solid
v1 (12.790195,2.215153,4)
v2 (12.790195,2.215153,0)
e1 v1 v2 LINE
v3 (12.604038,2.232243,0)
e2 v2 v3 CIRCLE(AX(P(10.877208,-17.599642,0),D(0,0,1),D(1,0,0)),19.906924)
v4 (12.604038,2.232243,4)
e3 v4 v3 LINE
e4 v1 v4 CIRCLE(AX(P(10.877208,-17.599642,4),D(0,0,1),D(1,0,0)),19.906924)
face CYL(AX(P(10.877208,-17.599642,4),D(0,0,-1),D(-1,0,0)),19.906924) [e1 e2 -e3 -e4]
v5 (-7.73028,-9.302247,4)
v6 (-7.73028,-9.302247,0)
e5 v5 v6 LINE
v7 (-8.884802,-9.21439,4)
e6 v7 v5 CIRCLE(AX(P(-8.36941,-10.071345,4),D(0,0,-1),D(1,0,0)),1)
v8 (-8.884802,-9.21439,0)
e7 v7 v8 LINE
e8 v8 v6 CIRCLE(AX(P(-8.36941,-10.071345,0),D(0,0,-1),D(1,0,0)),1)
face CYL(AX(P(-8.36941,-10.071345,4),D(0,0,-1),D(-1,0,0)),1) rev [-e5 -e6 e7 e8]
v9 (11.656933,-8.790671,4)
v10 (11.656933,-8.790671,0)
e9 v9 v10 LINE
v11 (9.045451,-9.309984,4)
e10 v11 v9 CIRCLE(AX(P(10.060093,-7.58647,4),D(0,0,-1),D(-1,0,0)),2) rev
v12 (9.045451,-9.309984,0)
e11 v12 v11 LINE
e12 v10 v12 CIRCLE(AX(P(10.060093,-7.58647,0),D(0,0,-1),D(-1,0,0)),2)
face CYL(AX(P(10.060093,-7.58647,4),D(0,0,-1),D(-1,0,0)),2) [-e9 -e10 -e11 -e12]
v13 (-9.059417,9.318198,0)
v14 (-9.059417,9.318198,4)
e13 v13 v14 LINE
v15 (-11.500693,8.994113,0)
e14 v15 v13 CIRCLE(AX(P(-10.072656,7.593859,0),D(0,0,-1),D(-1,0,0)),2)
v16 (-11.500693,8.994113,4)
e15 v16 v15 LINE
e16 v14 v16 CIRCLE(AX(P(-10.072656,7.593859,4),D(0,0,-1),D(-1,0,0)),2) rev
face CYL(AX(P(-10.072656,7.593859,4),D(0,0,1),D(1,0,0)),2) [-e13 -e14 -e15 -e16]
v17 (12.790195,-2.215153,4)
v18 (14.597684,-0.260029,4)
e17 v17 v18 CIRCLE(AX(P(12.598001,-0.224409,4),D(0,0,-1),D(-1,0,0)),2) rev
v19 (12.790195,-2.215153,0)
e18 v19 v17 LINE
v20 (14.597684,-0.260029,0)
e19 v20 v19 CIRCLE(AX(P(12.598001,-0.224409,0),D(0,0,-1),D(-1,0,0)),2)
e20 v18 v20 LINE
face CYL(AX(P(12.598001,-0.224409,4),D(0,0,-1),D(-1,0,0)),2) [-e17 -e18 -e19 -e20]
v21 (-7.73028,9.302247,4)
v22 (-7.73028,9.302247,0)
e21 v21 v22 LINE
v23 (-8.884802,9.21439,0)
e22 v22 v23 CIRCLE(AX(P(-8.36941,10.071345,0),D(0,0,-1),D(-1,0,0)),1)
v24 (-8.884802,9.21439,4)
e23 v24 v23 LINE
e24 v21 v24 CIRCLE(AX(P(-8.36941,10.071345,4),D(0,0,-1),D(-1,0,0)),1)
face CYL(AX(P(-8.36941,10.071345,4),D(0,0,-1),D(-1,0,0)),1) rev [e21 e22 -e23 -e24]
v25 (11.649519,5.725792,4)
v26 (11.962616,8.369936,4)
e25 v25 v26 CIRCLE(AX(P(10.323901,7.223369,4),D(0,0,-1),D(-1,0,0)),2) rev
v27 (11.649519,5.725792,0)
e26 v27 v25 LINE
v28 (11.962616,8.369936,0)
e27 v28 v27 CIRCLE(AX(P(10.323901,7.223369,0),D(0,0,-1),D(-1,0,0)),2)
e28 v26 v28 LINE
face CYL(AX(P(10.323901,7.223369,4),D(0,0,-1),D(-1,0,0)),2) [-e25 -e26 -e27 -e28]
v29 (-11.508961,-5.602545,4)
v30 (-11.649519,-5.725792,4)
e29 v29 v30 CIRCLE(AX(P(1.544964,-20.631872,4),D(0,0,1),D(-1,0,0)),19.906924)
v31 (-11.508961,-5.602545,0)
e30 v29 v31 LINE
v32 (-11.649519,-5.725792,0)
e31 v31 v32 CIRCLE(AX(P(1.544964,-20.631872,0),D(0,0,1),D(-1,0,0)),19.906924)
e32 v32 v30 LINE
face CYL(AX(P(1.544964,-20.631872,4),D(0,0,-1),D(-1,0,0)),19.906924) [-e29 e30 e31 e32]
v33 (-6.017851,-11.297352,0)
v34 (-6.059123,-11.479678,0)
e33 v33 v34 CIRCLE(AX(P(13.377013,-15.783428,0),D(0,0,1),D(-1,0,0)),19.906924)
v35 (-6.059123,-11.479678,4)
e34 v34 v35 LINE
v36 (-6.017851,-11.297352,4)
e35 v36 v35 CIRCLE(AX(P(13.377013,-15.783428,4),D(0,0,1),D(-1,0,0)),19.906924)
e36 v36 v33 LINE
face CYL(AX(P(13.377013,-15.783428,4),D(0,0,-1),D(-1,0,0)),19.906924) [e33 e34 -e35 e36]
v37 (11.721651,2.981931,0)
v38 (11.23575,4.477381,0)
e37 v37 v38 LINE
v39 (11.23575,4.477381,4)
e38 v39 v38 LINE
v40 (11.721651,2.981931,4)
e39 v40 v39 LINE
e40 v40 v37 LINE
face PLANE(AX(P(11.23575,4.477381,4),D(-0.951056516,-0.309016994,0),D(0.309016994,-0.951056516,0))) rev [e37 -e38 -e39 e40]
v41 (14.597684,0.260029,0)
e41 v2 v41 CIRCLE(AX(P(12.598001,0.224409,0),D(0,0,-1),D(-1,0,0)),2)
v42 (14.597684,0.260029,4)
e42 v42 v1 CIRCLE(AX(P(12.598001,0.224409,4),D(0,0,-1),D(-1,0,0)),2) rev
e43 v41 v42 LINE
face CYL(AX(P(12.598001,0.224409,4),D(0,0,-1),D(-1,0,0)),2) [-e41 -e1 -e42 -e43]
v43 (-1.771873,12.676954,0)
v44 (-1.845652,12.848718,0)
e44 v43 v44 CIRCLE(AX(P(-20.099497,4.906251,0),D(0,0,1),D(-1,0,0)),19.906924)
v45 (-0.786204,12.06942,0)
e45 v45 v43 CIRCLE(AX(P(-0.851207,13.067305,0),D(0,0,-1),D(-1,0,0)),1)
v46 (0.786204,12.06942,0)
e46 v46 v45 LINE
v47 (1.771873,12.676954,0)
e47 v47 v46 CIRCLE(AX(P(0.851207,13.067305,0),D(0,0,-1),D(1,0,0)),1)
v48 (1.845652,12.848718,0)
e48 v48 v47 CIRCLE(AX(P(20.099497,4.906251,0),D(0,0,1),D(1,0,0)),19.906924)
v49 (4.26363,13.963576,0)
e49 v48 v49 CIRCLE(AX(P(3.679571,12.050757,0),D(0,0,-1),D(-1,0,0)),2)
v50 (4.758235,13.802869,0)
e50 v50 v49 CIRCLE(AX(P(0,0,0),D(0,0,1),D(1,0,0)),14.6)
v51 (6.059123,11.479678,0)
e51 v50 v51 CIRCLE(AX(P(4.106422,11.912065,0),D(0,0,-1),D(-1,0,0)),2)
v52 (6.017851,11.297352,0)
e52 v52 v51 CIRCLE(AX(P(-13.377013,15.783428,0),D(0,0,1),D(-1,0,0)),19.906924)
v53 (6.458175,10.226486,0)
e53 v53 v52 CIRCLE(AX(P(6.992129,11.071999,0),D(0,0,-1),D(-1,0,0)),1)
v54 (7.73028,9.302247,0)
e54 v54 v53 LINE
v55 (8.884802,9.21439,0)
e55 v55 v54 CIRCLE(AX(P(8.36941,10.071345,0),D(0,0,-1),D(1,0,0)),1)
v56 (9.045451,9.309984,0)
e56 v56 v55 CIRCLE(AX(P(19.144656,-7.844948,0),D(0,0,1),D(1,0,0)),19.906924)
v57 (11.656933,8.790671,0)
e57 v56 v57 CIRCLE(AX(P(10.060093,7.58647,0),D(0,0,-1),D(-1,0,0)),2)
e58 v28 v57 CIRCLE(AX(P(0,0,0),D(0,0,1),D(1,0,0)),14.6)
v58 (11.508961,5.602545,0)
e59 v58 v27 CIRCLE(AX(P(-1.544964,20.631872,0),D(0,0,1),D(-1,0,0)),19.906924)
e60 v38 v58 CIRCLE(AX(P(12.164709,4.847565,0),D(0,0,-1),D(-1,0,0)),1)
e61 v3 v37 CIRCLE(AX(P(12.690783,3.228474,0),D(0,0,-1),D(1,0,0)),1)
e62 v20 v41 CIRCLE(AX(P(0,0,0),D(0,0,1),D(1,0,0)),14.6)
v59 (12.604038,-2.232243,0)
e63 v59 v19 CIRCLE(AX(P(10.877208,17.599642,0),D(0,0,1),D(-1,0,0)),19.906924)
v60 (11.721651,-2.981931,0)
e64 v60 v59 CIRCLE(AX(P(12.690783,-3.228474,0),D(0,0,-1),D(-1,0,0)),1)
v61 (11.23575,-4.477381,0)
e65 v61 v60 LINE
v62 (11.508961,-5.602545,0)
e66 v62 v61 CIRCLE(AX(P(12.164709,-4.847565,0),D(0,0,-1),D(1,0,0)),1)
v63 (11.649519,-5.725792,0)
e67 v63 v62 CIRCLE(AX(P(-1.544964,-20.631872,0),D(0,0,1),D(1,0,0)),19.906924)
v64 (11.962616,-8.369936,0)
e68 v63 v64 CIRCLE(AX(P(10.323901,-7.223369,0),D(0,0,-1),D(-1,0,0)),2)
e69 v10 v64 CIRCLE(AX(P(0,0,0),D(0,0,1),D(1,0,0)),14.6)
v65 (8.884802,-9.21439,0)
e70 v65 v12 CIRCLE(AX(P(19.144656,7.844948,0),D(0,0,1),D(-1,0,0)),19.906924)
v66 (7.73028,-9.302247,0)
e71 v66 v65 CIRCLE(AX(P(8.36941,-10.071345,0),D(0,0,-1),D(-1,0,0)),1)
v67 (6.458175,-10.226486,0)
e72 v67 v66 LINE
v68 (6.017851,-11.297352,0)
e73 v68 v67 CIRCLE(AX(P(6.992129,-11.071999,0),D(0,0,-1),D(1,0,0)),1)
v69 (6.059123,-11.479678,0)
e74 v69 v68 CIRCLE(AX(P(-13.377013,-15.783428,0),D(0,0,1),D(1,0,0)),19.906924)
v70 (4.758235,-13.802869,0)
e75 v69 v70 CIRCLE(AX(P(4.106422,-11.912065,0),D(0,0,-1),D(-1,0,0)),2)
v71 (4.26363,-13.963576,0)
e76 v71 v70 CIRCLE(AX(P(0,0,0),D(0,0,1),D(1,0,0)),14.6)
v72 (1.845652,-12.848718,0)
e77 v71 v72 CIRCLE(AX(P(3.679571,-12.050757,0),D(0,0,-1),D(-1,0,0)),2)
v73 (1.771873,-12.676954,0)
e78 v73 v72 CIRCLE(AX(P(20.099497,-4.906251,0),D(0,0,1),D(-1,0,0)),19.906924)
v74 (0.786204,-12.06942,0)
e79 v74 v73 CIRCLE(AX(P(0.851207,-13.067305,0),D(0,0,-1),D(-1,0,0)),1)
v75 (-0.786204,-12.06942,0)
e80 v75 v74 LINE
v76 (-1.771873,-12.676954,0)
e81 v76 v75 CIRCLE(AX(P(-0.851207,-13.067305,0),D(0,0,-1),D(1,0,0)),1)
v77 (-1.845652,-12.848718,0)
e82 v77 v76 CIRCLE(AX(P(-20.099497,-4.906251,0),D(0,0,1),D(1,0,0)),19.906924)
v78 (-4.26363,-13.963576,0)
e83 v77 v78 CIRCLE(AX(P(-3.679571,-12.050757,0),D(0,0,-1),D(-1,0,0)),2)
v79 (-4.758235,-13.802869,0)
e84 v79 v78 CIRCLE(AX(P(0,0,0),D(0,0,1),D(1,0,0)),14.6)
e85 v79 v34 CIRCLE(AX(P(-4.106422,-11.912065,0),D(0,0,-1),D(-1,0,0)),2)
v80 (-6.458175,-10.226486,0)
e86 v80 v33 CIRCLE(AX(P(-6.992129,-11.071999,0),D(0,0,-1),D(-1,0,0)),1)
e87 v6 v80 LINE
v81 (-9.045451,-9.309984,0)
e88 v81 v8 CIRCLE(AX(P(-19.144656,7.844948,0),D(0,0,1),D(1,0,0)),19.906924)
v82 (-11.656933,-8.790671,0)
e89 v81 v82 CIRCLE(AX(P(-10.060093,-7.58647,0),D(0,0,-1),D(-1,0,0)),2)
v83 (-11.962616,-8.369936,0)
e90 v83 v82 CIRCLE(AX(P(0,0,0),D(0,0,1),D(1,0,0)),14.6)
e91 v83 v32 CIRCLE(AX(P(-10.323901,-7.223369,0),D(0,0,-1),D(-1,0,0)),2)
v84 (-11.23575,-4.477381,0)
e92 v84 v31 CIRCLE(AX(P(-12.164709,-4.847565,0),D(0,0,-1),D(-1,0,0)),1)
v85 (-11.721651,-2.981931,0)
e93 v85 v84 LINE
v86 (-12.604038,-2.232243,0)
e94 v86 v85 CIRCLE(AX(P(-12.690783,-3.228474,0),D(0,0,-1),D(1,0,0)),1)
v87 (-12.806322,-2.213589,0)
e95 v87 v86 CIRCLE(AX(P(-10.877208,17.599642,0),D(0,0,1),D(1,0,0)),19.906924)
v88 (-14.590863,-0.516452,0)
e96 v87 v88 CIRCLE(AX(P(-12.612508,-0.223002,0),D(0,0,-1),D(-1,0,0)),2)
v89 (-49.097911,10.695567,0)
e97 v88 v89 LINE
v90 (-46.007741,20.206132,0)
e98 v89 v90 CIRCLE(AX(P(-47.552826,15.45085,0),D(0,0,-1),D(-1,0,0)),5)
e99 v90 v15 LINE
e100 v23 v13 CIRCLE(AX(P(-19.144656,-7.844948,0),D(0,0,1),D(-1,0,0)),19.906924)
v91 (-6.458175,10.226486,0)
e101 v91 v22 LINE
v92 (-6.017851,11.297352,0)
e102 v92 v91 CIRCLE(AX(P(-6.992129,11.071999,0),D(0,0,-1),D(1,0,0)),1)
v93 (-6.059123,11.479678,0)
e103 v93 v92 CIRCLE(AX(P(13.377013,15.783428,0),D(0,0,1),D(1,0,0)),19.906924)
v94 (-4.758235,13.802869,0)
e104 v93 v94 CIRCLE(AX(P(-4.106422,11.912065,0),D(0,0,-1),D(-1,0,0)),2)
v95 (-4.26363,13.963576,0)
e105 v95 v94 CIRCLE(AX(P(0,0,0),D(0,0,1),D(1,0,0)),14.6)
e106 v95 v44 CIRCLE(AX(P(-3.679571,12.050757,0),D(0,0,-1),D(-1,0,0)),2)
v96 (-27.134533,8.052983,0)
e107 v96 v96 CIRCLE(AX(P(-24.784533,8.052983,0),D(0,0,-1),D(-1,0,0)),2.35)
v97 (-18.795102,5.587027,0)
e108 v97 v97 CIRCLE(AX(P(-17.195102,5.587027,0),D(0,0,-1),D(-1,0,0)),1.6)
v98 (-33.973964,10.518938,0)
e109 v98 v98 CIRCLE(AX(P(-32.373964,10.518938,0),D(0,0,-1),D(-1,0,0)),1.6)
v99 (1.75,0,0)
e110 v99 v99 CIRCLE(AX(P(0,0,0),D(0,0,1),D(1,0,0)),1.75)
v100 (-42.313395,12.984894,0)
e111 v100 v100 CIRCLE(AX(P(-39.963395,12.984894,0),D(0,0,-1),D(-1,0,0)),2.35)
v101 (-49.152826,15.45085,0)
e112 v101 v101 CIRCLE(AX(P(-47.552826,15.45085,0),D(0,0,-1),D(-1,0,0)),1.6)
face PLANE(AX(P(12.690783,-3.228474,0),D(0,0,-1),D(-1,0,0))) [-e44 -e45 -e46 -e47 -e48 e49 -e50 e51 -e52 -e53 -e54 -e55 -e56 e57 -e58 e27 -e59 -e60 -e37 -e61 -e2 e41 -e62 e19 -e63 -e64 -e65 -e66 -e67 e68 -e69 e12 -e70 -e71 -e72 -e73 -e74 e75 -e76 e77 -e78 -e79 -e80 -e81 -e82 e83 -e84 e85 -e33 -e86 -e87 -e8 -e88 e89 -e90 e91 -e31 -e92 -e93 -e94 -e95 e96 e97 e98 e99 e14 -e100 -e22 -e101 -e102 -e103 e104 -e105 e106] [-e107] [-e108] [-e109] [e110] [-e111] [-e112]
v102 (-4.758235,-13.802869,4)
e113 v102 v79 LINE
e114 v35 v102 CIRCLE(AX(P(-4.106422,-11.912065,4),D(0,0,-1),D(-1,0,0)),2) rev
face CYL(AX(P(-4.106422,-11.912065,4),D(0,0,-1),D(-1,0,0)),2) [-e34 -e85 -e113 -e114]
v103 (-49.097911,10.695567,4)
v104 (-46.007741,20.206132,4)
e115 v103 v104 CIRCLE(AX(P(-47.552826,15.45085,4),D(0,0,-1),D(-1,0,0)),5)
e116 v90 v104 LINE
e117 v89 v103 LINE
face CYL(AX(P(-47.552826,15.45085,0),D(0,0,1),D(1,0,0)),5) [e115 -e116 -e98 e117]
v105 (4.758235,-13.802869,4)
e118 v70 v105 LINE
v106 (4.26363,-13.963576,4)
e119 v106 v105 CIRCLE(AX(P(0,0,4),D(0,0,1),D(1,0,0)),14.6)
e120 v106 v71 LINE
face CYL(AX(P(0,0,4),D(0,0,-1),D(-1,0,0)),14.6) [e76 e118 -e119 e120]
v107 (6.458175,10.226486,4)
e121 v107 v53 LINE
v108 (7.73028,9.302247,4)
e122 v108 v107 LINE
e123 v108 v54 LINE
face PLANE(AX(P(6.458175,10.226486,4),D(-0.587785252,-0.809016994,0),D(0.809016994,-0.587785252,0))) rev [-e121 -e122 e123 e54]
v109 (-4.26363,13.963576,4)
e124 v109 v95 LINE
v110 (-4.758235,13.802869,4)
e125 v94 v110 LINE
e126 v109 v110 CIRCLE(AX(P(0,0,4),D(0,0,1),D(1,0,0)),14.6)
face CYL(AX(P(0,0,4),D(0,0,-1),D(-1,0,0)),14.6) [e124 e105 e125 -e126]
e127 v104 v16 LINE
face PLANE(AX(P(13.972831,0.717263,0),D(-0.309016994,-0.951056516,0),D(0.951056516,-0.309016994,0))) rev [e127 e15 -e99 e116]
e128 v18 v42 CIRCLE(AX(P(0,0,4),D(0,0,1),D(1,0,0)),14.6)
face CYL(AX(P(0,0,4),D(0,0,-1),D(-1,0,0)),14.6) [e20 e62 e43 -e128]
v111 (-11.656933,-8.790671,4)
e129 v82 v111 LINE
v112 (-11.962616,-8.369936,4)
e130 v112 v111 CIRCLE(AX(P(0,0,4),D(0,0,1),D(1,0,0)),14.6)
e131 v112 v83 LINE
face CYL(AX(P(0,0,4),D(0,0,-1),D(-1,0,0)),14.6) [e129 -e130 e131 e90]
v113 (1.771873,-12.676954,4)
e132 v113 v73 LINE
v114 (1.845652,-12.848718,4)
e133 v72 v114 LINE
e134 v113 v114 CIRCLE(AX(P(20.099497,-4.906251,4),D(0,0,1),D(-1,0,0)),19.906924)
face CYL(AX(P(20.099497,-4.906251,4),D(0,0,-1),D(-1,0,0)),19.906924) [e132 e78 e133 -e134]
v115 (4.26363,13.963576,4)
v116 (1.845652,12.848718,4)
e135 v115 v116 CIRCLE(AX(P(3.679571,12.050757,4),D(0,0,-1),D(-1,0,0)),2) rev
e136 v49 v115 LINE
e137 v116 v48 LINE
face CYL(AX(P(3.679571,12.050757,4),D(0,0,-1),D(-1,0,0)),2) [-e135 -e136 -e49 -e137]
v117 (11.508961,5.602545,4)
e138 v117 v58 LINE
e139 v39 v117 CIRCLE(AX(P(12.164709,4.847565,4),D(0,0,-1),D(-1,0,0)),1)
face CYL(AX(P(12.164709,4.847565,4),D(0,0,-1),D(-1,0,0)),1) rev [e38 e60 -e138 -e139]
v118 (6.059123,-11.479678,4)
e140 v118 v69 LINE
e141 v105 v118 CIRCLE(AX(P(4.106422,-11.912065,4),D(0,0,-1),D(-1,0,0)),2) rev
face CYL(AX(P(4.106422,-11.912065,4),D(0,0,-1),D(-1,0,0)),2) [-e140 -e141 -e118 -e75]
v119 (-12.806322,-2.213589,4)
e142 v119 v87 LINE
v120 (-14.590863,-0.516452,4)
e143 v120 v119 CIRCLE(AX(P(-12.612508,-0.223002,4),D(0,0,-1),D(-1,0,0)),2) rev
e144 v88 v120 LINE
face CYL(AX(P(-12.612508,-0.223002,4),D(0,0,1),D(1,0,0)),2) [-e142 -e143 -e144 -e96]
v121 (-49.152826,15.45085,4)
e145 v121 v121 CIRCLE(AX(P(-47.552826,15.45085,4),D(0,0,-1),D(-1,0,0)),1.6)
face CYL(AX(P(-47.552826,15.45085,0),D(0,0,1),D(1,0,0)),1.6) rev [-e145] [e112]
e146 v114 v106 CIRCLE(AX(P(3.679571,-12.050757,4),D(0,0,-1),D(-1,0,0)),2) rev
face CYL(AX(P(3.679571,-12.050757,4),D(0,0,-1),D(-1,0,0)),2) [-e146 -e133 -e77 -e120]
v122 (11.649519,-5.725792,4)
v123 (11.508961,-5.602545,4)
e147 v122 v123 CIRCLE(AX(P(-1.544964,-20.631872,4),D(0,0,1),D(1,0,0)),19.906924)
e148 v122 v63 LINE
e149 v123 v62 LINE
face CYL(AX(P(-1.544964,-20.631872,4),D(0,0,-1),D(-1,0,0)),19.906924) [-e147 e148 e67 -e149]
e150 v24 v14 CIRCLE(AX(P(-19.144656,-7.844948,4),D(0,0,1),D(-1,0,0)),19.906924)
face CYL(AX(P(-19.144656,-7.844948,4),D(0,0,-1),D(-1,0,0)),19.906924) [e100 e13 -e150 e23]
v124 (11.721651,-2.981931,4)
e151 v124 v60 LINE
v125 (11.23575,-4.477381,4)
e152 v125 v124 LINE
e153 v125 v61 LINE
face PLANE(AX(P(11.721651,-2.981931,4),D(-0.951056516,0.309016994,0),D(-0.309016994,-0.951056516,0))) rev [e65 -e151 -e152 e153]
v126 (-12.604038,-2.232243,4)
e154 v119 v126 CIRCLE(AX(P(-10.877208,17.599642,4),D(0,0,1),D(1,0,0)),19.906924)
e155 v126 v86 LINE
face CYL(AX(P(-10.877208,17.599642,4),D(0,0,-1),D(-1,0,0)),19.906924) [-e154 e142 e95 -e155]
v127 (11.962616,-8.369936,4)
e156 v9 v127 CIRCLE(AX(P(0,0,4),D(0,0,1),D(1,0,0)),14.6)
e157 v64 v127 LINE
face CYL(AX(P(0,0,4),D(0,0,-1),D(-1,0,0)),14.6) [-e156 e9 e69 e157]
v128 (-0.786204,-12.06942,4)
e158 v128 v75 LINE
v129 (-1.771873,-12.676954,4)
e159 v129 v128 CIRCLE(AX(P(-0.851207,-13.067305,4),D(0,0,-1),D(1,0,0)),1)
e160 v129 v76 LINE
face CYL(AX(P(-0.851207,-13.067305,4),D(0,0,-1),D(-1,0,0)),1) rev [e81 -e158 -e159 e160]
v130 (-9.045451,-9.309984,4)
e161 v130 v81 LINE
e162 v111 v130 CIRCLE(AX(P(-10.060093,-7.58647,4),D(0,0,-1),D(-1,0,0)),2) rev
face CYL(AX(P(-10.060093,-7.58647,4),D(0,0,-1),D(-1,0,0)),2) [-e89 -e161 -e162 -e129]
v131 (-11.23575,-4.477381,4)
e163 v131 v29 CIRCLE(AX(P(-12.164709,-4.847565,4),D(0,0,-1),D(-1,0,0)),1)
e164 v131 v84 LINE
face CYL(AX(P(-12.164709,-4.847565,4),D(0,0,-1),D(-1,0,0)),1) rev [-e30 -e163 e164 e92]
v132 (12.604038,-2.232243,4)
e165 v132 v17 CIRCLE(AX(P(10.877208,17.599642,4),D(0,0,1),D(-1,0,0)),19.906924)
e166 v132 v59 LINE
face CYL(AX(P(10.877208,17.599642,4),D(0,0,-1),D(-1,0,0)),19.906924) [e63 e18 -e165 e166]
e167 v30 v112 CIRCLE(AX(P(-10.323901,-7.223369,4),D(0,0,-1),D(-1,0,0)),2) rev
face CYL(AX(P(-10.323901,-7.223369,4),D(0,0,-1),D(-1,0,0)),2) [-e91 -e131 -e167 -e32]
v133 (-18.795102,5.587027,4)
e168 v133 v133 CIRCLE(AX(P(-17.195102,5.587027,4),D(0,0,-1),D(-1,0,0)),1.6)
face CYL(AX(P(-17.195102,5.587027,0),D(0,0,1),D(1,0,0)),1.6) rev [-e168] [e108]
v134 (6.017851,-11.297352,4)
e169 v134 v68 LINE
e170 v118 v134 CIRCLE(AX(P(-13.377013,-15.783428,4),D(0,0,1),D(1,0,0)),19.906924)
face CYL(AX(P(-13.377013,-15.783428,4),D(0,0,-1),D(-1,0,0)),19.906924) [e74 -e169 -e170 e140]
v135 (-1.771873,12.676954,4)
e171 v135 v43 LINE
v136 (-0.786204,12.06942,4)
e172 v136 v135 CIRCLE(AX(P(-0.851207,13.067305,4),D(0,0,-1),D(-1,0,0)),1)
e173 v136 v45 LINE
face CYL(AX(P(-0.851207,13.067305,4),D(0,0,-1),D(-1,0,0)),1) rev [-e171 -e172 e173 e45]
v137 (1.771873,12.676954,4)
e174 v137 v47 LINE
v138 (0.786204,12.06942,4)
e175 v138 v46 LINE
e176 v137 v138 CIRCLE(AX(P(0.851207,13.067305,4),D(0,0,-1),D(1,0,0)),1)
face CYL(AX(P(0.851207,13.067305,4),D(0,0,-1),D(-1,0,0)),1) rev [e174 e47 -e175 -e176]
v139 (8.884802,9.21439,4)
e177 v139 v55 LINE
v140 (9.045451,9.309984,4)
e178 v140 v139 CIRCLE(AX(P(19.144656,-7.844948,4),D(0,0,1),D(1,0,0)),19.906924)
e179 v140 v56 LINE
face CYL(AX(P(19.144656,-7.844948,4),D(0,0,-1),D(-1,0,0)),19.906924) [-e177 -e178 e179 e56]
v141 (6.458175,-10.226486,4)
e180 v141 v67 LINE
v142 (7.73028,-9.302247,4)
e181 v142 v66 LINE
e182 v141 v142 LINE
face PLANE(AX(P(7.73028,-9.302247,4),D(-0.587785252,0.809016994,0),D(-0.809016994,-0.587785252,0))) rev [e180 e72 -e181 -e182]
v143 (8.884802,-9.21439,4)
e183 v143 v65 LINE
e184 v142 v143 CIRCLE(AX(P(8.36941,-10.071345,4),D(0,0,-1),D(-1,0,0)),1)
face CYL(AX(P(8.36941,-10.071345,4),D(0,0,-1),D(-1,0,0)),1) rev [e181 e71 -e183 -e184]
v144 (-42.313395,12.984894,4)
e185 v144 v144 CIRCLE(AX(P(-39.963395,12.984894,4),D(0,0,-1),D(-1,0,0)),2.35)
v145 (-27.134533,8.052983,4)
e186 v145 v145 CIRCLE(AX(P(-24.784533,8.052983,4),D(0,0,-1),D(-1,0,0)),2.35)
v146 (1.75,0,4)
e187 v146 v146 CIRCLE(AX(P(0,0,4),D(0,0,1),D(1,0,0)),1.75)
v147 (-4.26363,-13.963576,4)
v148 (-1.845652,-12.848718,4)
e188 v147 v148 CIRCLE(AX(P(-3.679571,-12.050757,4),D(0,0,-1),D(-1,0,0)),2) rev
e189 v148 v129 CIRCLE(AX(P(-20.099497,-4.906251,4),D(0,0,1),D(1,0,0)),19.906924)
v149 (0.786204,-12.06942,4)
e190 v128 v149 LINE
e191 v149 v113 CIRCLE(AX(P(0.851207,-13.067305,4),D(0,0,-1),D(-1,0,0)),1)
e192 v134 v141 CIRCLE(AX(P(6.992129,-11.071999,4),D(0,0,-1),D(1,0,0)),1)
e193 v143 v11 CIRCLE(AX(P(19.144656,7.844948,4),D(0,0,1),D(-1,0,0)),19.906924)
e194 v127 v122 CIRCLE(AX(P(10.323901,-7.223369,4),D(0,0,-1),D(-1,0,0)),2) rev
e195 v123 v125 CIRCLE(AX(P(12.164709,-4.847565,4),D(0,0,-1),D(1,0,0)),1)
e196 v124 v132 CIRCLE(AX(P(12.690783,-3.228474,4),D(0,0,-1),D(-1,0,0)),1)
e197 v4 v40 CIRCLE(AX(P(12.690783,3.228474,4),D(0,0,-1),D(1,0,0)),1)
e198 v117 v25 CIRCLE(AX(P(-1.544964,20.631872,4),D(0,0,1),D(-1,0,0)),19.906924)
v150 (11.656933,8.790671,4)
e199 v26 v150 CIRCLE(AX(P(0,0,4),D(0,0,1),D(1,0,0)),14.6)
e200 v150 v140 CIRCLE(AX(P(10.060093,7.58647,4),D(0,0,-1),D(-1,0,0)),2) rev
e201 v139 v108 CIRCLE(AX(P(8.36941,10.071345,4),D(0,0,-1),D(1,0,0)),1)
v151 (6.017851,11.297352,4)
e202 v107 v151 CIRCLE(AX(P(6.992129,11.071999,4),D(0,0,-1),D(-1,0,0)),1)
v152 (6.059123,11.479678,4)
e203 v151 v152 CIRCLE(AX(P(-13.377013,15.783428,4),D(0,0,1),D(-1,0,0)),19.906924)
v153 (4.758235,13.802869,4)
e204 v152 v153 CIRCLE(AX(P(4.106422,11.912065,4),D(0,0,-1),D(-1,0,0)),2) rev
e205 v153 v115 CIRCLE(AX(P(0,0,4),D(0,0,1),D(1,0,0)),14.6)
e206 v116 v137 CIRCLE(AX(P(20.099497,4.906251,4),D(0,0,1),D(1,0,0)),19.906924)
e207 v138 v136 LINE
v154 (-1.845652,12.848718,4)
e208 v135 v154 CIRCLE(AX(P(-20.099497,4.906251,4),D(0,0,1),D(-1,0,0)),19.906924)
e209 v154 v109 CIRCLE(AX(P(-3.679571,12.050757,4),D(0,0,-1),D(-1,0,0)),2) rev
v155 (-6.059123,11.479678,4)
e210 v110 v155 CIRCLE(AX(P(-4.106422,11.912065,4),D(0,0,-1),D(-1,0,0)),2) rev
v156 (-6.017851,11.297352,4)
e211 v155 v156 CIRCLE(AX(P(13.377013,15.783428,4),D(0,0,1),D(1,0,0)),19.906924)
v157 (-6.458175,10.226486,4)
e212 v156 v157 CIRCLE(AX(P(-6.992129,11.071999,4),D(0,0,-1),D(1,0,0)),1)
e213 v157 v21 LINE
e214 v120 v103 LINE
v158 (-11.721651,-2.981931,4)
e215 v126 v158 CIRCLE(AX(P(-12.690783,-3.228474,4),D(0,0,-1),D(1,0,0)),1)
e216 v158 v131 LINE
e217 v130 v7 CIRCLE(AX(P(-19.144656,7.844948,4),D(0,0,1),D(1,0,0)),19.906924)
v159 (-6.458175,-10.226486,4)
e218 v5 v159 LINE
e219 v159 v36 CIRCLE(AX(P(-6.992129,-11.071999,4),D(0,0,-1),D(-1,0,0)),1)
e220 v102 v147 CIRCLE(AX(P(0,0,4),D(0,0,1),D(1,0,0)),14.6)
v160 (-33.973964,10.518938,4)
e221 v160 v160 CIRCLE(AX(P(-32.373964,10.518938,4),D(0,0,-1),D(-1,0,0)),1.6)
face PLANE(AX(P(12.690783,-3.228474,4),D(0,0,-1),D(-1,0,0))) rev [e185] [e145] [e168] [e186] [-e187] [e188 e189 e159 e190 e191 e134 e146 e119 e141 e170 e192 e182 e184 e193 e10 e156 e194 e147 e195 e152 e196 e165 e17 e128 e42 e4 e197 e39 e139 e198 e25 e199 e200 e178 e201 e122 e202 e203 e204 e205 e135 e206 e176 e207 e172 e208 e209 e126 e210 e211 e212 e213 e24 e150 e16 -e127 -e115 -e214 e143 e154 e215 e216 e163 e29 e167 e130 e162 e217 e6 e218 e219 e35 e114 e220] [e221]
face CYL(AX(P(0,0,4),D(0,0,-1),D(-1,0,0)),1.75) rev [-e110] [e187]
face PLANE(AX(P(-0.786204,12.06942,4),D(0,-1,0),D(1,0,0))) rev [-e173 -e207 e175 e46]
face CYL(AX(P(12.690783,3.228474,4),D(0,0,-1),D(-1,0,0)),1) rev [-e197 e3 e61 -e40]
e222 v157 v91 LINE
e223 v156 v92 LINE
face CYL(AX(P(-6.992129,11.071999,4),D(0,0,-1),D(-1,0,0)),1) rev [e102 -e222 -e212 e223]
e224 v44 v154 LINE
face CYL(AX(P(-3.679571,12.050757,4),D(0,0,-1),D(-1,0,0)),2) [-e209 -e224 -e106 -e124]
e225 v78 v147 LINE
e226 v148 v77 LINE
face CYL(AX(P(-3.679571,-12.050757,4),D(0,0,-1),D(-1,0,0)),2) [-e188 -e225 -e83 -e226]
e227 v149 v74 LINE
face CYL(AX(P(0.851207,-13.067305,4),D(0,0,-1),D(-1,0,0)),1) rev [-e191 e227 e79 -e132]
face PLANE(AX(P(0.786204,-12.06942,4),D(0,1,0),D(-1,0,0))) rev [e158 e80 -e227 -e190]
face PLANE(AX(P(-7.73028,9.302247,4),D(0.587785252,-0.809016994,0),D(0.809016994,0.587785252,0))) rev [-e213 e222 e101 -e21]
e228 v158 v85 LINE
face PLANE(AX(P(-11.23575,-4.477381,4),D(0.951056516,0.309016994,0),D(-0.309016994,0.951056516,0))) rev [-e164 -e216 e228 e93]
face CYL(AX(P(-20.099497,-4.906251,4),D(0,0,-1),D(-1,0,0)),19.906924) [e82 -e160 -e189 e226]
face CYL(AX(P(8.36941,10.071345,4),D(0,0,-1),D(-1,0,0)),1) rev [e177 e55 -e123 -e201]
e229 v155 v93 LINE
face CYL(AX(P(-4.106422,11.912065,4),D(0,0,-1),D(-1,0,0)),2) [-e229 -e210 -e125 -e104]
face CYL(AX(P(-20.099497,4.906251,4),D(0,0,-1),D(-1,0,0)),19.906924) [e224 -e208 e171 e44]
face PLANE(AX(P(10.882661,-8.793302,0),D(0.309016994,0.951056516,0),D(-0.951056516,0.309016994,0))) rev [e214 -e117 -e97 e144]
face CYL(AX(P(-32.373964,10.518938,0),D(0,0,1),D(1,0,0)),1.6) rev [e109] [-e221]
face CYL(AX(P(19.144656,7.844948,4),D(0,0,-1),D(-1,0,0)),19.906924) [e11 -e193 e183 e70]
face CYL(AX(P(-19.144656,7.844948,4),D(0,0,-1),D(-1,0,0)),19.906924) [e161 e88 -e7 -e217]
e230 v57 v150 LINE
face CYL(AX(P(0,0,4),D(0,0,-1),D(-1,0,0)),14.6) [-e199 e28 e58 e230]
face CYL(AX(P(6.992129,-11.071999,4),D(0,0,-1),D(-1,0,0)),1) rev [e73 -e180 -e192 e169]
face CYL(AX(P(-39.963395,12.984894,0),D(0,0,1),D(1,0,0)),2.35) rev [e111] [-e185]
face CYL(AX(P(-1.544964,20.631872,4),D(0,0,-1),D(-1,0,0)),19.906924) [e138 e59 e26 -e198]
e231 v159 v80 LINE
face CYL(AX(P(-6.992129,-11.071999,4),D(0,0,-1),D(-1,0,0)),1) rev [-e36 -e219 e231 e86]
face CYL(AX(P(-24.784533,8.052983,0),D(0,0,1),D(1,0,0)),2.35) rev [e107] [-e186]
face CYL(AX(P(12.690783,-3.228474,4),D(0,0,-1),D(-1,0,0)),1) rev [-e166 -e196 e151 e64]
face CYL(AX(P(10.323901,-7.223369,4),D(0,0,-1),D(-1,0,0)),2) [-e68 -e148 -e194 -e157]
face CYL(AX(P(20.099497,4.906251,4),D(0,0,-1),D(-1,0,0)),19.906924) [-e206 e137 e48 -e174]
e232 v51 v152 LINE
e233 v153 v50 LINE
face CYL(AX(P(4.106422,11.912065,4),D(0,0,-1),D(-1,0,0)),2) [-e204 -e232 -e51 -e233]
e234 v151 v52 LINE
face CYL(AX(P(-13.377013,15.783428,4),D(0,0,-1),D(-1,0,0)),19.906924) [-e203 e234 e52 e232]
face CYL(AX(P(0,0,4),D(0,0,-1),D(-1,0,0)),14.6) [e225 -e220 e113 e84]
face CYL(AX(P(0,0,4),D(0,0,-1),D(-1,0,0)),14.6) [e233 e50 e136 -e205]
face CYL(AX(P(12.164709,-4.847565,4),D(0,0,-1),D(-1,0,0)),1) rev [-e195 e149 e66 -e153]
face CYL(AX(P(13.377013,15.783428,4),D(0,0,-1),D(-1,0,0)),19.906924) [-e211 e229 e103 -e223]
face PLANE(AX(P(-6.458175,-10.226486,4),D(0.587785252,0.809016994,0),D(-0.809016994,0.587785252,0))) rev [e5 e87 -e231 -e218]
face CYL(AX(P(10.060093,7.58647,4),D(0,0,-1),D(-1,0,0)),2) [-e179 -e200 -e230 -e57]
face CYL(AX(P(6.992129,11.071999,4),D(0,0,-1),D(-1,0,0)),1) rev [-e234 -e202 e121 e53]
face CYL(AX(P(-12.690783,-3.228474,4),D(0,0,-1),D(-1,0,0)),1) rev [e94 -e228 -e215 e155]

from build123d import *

# Parameters (mm, degrees)
SKETCH1_R           = 1.75
BOSS_EXTRUDE1_DEPTH = 4
BOSS_EXTRUDE2_START = -4
SKETCH2_R           = 1.6
SKETCH2_R_2         = 2.35
BOSS_EXTRUDE2_DEPTH = 4
FILLET1_R           = 2


with BuildPart() as part:
    # Sketch1 → Boss-Extrude1 (new body)
    with BuildSketch(Plane.XY):
        with BuildLine():
            Line((6.458174517, 10.22648556), (7.730280052, 9.302246788))
            ThreePointArc((7.730280052, 9.302246788), (8.293531937, 9.074228241), (8.884801529, 9.214390334))
            ThreePointArc((8.884801529, 9.214390334), (9.700788202, 9.679292345), (10.537793023, 10.105192636))
            ThreePointArc((10.537793023, 10.105192636), (11.811648118, 8.581664683), (12.866966432, 6.899360466))
            ThreePointArc((12.866966432, 6.899360466), (12.203262471, 6.234932004), (11.508960635, 5.602545185))
            ThreePointArc((11.508960635, 5.602545185), (11.192946211, 5.083526854), (11.235750332, 4.477380873))
            Line((11.235750332, 4.477380873), (11.721651409, 2.981931127))
            ThreePointArc((11.721651409, 2.981931127), (12.043305816, 2.466389096), (12.604038176, 2.232243064))
            ThreePointArc((12.604038176, 2.232243064), (13.537447807, 2.12873176), (14.464936842, 1.981313243))
            ThreePointArc((14.464936842, 1.981313243), (14.6, 0), (14.464936842, -1.981313243))
            ThreePointArc((14.464936842, -1.981313243), (13.537447807, -2.12873176), (12.604038176, -2.232243064))
            ThreePointArc((12.604038176, -2.232243064), (12.043305816, -2.466389096), (11.721651409, -2.981931127))
            Line((11.721651409, -2.981931127), (11.235750332, -4.477380873))
            ThreePointArc((11.235750332, -4.477380873), (11.192946211, -5.083526854), (11.508960635, -5.602545185))
            ThreePointArc((11.508960635, -5.602545185), (12.203262471, -6.234932004), (12.866966432, -6.899360466))
            ThreePointArc((12.866966432, -6.899360466), (11.811648118, -8.581664683), (10.537793023, -10.105192636))
            ThreePointArc((10.537793023, -10.105192636), (9.700788202, -9.679292345), (8.884801529, -9.214390334))
            ThreePointArc((8.884801529, -9.214390334), (8.293531937, -9.074228241), (7.730280052, -9.302246788))
            Line((7.730280052, -9.302246788), (6.458174517, -10.22648556))
            ThreePointArc((6.458174517, -10.22648556), (6.067261587, -10.691708329), (6.017851306, -11.297351596))
            ThreePointArc((6.017851306, -11.297351596), (6.207845644, -12.21706366), (6.354252177, -13.144712978))
            ThreePointArc((6.354252177, -13.144712978), (4.511648118, -13.885425138), (2.585570436, -14.369231904))
            ThreePointArc((2.585570436, -14.369231904), (2.158757221, -13.532692241), (1.771872682, -12.676953681))
            ThreePointArc((1.771872682, -12.676953681), (1.375910744, -12.216020619), (0.786204458, -12.069420349))
            Line((0.786204458, -12.069420349), (-0.786204458, -12.069420349))
            ThreePointArc((-0.786204458, -12.069420349), (-1.375910744, -12.216020619), (-1.771872682, -12.676953681))
            ThreePointArc((-1.771872682, -12.676953681), (-2.158757221, -13.532692241), (-2.585570436, -14.369231904))
            ThreePointArc((-2.585570436, -14.369231904), (-4.511648118, -13.885425138), (-6.354252177, -13.144712978))
            ThreePointArc((-6.354252177, -13.144712978), (-6.207845644, -12.21706366), (-6.017851306, -11.297351596))
            ThreePointArc((-6.017851306, -11.297351596), (-6.067261587, -10.691708329), (-6.458174517, -10.22648556))
            Line((-6.458174517, -10.22648556), (-7.730280052, -9.302246788))
            ThreePointArc((-7.730280052, -9.302246788), (-8.293531937, -9.074228241), (-8.884801529, -9.214390334))
            ThreePointArc((-8.884801529, -9.214390334), (-9.700788202, -9.679292345), (-10.537793023, -10.105192636))
            ThreePointArc((-10.537793023, -10.105192636), (-11.811648118, -8.581664683), (-12.866966432, -6.899360466))
            ThreePointArc((-12.866966432, -6.899360466), (-12.203262471, -6.234932004), (-11.508960635, -5.602545185))
            ThreePointArc((-11.508960635, -5.602545185), (-11.192946211, -5.083526854), (-11.235750332, -4.477380873))
            Line((-11.235750332, -4.477380873), (-11.721651409, -2.981931127))
            ThreePointArc((-11.721651409, -2.981931127), (-12.043305816, -2.466389096), (-12.604038176, -2.232243064))
            ThreePointArc((-12.604038176, -2.232243064), (-13.537447807, -2.12873176), (-14.464936842, -1.981313243))
            ThreePointArc((-14.464936842, -1.981313243), (-14.6, 0), (-14.464936842, 1.981313243))
            ThreePointArc((-14.464936842, 1.981313243), (-13.537447807, 2.12873176), (-12.604038176, 2.232243064))
            ThreePointArc((-12.604038176, 2.232243064), (-12.043305816, 2.466389096), (-11.721651409, 2.981931127))
            Line((-11.721651409, 2.981931127), (-11.235750332, 4.477380873))
            ThreePointArc((-11.235750332, 4.477380873), (-11.192946211, 5.083526854), (-11.508960635, 5.602545185))
            ThreePointArc((-11.508960635, 5.602545185), (-12.203262471, 6.234932004), (-12.866966432, 6.899360466))
            ThreePointArc((-12.866966432, 6.899360466), (-11.811648118, 8.581664683), (-10.537793023, 10.105192636))
            ThreePointArc((-10.537793023, 10.105192636), (-9.700788202, 9.679292345), (-8.884801529, 9.214390334))
            ThreePointArc((-8.884801529, 9.214390334), (-8.293531937, 9.074228241), (-7.730280052, 9.302246788))
            Line((-7.730280052, 9.302246788), (-6.458174517, 10.22648556))
            ThreePointArc((-6.458174517, 10.22648556), (-6.067261587, 10.691708329), (-6.017851306, 11.297351596))
            ThreePointArc((-6.017851306, 11.297351596), (-6.207845644, 12.21706366), (-6.354252177, 13.144712978))
            ThreePointArc((-6.354252177, 13.144712978), (-4.511648118, 13.885425138), (-2.585570436, 14.369231904))
            ThreePointArc((-2.585570436, 14.369231904), (-2.158757221, 13.532692241), (-1.771872682, 12.676953681))
            ThreePointArc((-1.771872682, 12.676953681), (-1.375910744, 12.216020619), (-0.786204458, 12.069420349))
            Line((-0.786204458, 12.069420349), (0.786204458, 12.069420349))
            ThreePointArc((0.786204458, 12.069420349), (1.375910744, 12.216020619), (1.771872682, 12.676953681))
            ThreePointArc((1.771872682, 12.676953681), (2.158757221, 13.532692241), (2.585570436, 14.369231904))
            ThreePointArc((2.585570436, 14.369231904), (4.511648118, 13.885425138), (6.354252177, 13.144712978))
            ThreePointArc((6.354252177, 13.144712978), (6.207845644, 12.21706366), (6.017851306, 11.297351596))
            ThreePointArc((6.017851306, 11.297351596), (6.067261587, 10.691708329), (6.458174517, 10.22648556))
        make_face()
        Circle(SKETCH1_R, mode=Mode.SUBTRACT)
    extrude(amount=BOSS_EXTRUDE1_DEPTH)

    # Sketch2 → Boss-Extrude2 (add)
    with BuildSketch(Plane(origin=(0, 0, 0), x_dir=(-1, 0, 0), z_dir=(0, 0, -1)).offset(BOSS_EXTRUDE2_START)):
        with BuildLine():
            Line((7.965480191, 7.845452525), (46.007740843, 20.2061323))
            ThreePointArc((46.007740843, 20.2061323), (52.308108396, 16.995934691), (49.097910787, 10.695567137))
            Line((49.097910787, 10.695567137), (11.055650135, -1.665112638))
            Line((11.055650135, -1.665112638), (7.965480191, 7.845452525))
        make_face()
        with Locations((47.552825815, 15.450849719)):
            Circle(SKETCH2_R, mode=Mode.SUBTRACT)
        with Locations((39.963394815, 12.984894104)):
            Circle(SKETCH2_R_2, mode=Mode.SUBTRACT)
        with Locations((32.373963815, 10.518938489)):
            Circle(SKETCH2_R, mode=Mode.SUBTRACT)
        with Locations((24.784532815, 8.052982873)):
            Circle(SKETCH2_R_2, mode=Mode.SUBTRACT)
        with Locations((17.195101815, 5.587027258)):
            Circle(SKETCH2_R, mode=Mode.SUBTRACT)
    extrude(amount=BOSS_EXTRUDE2_DEPTH)

    # Fillet1
    # the kernel refuses this fillet: 2 mm, written as the material it takes off along each edge
    with BuildSketch(Plane(origin=(-14.464936842, -1.981313243, -4.187001337), x_dir=(-0.08564855994772169, 0.9963254107864967, 0), z_dir=(0, 0, 1))) as fillet1_piece_1:
        with BuildLine():
            CenterArc((1.593192122, -1.99621856), FILLET1_R, 93.523868458, 76.001739978)
            Line((-0.373480398, -1.63262648), (-0.412813848, -1.625354638))
            ThreePointArc((-0.412813848, -1.625354638), (-0.242909966, -0.803463818), (-0.038582997, 0.010552361))
            Line((-0.038582997, 0.010552361), (-0.00201406, 0.039949262))
            ThreePointArc((-0.00201406, 0.039949262), (0.73513172, 0.058519233), (1.467804867, 0.039924371))
            Line((1.467804867, 0.039924371), (1.470263441, 0))
        make_face()
    extrude(amount=12.374002673, mode=Mode.SUBTRACT)
    with BuildSketch(Plane(origin=(-10.537793023, 10.105192636, -4.187001337), x_dir=(0.8827178463652419, -0.4699033982727826, 0), z_dir=(0, 0, 1))) as fillet1_piece_2:
        with BuildLine():
            CenterArc((1.590668977, -1.998229687), FILLET1_R, 87.589097028, 76.001739978)
            Line((-0.327868641, -1.433239945), (-0.366239393, -1.42194015))
            ThreePointArc((-0.366239393, -1.42194015), (-0.220979949, -0.703570188), (-0.038494143, 0.010872025))
            Line((-0.038494143, 0.010872025), (-0.001682631, 0.039964594))
            ThreePointArc((-0.001682631, 0.039964594), (0.837400267, 0.057620746), (1.676483166, 0.039964594))
            Line((1.676483166, 0.039964594), (1.674800535, 0))
        make_face()
    extrude(amount=12.374002673, mode=Mode.SUBTRACT)
    with BuildSketch(Plane(origin=(-6.354252177, 13.144712978, -4.315988382), x_dir=(0.9244796007365503, 0.3812315147282405, 0), z_dir=(0, 0, 1)), Plane(origin=(2.585570436, 14.369231904, -4.315988382), x_dir=(0.9720019700152155, -0.23497270115172955, 0), z_dir=(0, 0, 1)), Plane(origin=(10.537793023, 10.105192636, -4.315988382), x_dir=(0.6482526238799229, -0.7614253316201104, 0), z_dir=(0, 0, 1)), Plane(origin=(14.464936842, 1.981313243, -4.315988382), x_dir=(0.07689280871880408, -0.9970393653047674, 0), z_dir=(0, 0, 1)), Plane(origin=(12.866966432, -6.899360466, -4.315988382), x_dir=(-0.5238374458824551, -0.8518182495646274, 0), z_dir=(0, 0, 1)), Plane(origin=(6.354252177, -13.144712978, -4.315988382), x_dir=(-0.9244796007365504, -0.3812315147282399, 0), z_dir=(0, 0, 1)), Plane(origin=(-2.585570436, -14.369231904, -4.315988382), x_dir=(-0.9720019700152157, 0.23497270115172855, 0), z_dir=(0, 0, 1)), Plane(origin=(-10.537793023, -10.105192636, -4.315988382), x_dir=(-0.6482526238799226, 0.7614253316201107, 0), z_dir=(0, 0, 1))) as fillet1_piece_3:
        with BuildLine():
            CenterArc((1.608149096, -1.996501396), FILLET1_R, 86.610517624, 83.465059025)
            Line((-0.361922802, -1.651803385), (-0.40132424, -1.644909425))
            ThreePointArc((-0.40132424, -1.644909425), (-0.237581401, -0.813495816), (-0.038674208, 0.010213013))
            Line((-0.038674208, 0.010213013), (-0.002364925, 0.039930028))
            ThreePointArc((-0.002364925, 0.039930028), (0.863197676, 0.065539812), (1.728760278, 0.039930028))
            Line((1.728760278, 0.039930028), (1.726395353, 0))
        make_face()
    extrude(amount=12.631976765, mode=Mode.SUBTRACT)
    with BuildSketch(Plane(origin=(-2.585570436, 14.369231904, -4.315988382), x_dir=(0.43756555631998817, -0.8991865123111997, 0), z_dir=(0, 0, 1)), Plane(origin=(6.354252177, 13.144712978, -4.315988382), x_dir=(-0.1745305997808264, -0.9846517504885395, 0), z_dir=(0, 0, 1)), Plane(origin=(12.866966432, 6.899360466, -4.315988382), x_dir=(-0.719961998842273, -0.6940134870613388, 0), z_dir=(0, 0, 1)), Plane(origin=(14.464936842, -1.981313243, -4.315988382), x_dir=(-0.9903923849542835, -0.13828566022753844, 0), z_dir=(0, 0, 1)), Plane(origin=(10.537793023, -10.105192636, -4.315988382), x_dir=(-0.8825265422128264, 0.47026258865645726, 0), z_dir=(0, 0, 1)), Plane(origin=(2.585570436, -14.369231904, -4.315988382), x_dir=(-0.4375655563199897, 0.899186512311199, 0), z_dir=(0, 0, 1)), Plane(origin=(-6.354252177, -13.144712978, -4.315988382), x_dir=(0.17453059978082774, 0.9846517504885393, 0), z_dir=(0, 0, 1)), Plane(origin=(-12.866966432, -6.899360466, -4.315988382), x_dir=(0.7199619988422736, 0.694013487061338, 0), z_dir=(0, 0, 1))) as fillet1_piece_4:
        with BuildLine():
            CenterArc((1.606043881, -1.998195283), FILLET1_R, 87.565780038, 83.465059025)
            Line((-0.369500914, -1.686389632), (-0.40901181, -1.680153518))
            ThreePointArc((-0.40901181, -1.680153518), (-0.248771516, -0.82916731), (-0.038498565, 0.010856359))
            Line((-0.038498565, 0.010856359), (-0.001698895, 0.039963906))
            ThreePointArc((-0.001698895, 0.039963906), (0.845494314, 0.05796318), (1.692687522, 0.039963906))
            Line((1.692687522, 0.039963906), (1.690988628, 0))
        make_face()
    extrude(amount=12.631976765, mode=Mode.SUBTRACT)


solid = part.part
